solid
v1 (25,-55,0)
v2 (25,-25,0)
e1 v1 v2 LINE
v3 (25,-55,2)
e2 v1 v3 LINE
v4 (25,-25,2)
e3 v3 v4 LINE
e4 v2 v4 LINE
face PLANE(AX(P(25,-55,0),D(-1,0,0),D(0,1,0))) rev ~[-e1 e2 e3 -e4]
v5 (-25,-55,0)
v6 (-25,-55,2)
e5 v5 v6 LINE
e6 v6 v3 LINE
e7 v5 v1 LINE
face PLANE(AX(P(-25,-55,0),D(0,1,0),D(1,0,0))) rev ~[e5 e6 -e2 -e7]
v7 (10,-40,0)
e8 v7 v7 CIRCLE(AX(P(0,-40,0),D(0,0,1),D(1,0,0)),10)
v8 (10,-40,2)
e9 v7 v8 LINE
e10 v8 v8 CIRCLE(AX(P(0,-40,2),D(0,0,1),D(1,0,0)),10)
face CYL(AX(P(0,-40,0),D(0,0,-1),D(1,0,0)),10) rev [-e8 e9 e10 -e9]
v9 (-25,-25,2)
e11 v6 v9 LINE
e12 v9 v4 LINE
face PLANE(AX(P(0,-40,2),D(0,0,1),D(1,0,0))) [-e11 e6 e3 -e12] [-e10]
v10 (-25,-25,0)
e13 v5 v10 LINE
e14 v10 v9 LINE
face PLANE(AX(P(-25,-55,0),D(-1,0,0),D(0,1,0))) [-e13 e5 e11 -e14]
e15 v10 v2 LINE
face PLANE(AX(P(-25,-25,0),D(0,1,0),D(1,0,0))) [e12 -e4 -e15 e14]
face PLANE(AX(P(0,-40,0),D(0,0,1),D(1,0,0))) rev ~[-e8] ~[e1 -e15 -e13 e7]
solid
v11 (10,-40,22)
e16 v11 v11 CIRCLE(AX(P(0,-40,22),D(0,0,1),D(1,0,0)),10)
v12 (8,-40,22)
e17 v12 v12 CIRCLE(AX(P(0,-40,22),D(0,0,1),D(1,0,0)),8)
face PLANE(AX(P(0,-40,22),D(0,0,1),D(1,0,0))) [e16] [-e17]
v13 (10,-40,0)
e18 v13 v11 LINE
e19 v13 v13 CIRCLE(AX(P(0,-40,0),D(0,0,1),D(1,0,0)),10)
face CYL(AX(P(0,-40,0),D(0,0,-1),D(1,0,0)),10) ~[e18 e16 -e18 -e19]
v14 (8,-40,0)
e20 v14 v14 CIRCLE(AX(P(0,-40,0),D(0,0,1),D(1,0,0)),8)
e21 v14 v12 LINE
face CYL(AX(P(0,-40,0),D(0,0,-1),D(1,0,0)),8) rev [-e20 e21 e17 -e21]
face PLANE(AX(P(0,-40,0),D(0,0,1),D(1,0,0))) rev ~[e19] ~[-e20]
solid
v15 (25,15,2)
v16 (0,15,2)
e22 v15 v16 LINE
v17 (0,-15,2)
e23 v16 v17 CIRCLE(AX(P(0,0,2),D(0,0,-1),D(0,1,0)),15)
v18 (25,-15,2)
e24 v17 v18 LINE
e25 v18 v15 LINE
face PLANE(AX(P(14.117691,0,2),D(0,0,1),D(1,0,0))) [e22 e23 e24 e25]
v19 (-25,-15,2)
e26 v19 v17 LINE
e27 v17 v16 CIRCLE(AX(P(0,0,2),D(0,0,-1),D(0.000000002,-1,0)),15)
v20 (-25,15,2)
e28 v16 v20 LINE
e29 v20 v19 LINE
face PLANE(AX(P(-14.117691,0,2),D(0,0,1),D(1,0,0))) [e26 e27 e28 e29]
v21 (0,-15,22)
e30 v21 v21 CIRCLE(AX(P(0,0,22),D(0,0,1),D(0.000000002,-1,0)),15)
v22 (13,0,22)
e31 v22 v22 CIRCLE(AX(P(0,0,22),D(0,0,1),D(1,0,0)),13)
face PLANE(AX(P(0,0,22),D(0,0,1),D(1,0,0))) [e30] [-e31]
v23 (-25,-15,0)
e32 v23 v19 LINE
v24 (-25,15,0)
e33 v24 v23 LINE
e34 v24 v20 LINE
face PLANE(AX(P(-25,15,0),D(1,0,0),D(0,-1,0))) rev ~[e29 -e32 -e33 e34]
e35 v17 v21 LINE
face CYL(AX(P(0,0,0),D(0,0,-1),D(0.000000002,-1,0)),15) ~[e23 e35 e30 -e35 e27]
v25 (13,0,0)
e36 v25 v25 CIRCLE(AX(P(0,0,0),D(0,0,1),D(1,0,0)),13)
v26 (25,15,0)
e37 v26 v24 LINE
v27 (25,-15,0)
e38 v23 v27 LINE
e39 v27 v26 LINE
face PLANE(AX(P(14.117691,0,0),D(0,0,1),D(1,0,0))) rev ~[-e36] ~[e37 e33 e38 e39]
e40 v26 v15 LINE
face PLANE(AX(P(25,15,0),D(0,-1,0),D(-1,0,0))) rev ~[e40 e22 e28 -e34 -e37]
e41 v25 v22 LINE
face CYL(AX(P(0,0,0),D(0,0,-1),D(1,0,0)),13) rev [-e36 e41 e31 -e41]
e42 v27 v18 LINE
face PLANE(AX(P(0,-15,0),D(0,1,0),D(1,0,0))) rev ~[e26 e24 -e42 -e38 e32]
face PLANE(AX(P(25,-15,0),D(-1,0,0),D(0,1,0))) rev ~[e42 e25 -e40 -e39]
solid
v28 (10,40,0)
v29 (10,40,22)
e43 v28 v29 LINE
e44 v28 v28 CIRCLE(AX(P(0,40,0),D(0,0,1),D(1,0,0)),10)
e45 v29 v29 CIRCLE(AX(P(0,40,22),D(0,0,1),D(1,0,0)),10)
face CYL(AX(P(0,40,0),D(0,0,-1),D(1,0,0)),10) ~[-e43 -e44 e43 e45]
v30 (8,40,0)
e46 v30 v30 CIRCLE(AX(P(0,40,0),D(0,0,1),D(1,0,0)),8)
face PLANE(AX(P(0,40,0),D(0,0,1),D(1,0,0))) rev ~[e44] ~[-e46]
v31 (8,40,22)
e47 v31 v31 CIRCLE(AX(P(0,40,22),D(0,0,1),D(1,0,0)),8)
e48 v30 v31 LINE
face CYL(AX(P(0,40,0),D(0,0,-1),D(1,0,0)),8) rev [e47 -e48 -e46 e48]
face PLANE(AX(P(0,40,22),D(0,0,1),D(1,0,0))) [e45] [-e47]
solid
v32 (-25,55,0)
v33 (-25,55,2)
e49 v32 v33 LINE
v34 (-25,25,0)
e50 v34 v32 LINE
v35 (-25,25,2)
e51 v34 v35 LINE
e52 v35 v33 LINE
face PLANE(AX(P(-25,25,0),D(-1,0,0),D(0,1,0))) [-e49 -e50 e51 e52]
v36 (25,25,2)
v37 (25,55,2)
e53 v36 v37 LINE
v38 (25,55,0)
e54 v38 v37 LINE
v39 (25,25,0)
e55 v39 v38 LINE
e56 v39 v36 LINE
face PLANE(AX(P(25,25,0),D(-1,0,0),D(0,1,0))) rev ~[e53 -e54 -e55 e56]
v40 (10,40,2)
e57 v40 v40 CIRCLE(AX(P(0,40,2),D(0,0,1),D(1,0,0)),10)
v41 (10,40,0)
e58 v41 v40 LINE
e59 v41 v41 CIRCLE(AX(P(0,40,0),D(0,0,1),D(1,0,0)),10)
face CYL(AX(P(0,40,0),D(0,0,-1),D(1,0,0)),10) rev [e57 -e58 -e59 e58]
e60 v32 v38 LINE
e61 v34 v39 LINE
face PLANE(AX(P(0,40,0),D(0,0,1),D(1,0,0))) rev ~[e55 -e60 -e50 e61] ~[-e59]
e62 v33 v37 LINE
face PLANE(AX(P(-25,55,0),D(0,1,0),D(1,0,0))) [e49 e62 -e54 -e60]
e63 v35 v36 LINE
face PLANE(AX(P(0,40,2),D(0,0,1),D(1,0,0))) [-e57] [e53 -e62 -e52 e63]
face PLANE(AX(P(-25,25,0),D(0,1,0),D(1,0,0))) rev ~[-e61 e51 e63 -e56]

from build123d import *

# Parameters (mm, degrees)
F1_DEPTH = 2
F0_W     = 50
F0_H     = 30
F0_R     = 10
F0_R_2   = 13
F2_DEPTH = 22
F0_R_3   = 8


with BuildPart() as f1:
    # F0 (on Top) → F1 (new body)
    with BuildSketch(Plane.XY):
        with BuildLine():
            Line((0, 15), (-25, 15))
            Line((-25, 15), (-25, -15))
            Line((-25, -15), (3.27e-08, -15))
            ThreePointArc((3.27e-08, -15), (-15, -1.63e-08), (0, 15))
        make_face()
    extrude(amount=F1_DEPTH)



with BuildPart() as f1b:
    # F0 (on Top) → F1, piece 2 (new body)
    with BuildSketch(Plane.XY):
        with BuildLine():
            Line((25, 15), (0, 15))
            ThreePointArc((0, 15), (10.6066017178, 10.6066017178), (15, 0))
            ThreePointArc((15, 0), (10.6066017294, -10.6066017062), (3.27e-08, -15))
            Line((3.27e-08, -15), (25, -15))
            Line((25, -15), (25, 15))
        make_face()
    extrude(amount=F1_DEPTH)


with BuildPart() as f1c:
    # F0 (on Top) → F1, piece 3 (new body)
    with BuildSketch(Plane.XY):
        with Locations((0, 40)):
            Rectangle(F0_W, F0_H)
        with Locations((0, 40)):
            Circle(F0_R, mode=Mode.SUBTRACT)
    extrude(amount=F1_DEPTH)


with BuildPart() as f1d:
    # F0 (on Top) → F1, piece 4 (new body)
    with BuildSketch(Plane.XY):
        with Locations((0, -40)):
            Rectangle(F0_W, F0_H)
        with Locations((0, -40)):
            Circle(F0_R, mode=Mode.SUBTRACT)
    extrude(amount=F1_DEPTH)


with BuildPart() as f1_1:
    add(f1.part)

    add(f1b.part)  # F2 merges F1b
    # F0 (on Top) → F2 (join)
    with BuildSketch(Plane.XY):
        with BuildLine():
            ThreePointArc((15, 0), (10.6066017178, 10.6066017178), (0, 15))
            ThreePointArc((0, 15), (-15, -1.63e-08), (3.27e-08, -15))
            ThreePointArc((3.27e-08, -15), (10.6066017294, -10.6066017062), (15, 0))
        make_face()
        Circle(F0_R_2, mode=Mode.SUBTRACT)
    extrude(amount=F2_DEPTH)


with BuildPart() as f2:
    # F0 (on Top) → F2, piece 2 (new body)
    with BuildSketch(Plane.XY):
        with Locations((0, 40)):
            Circle(F0_R)
        with Locations((0, 40)):
            Circle(F0_R_3, mode=Mode.SUBTRACT)
    extrude(amount=F2_DEPTH)


with BuildPart() as f2b:
    # F0 (on Top) → F2, piece 3 (new body)
    with BuildSketch(Plane.XY):
        with Locations((0, -40)):
            Circle(F0_R)
        with Locations((0, -40)):
            Circle(F0_R_3, mode=Mode.SUBTRACT)
    extrude(amount=F2_DEPTH)


solid = Compound([f1c.part, f1d.part, f1_1.part, f2.part, f2b.part])
